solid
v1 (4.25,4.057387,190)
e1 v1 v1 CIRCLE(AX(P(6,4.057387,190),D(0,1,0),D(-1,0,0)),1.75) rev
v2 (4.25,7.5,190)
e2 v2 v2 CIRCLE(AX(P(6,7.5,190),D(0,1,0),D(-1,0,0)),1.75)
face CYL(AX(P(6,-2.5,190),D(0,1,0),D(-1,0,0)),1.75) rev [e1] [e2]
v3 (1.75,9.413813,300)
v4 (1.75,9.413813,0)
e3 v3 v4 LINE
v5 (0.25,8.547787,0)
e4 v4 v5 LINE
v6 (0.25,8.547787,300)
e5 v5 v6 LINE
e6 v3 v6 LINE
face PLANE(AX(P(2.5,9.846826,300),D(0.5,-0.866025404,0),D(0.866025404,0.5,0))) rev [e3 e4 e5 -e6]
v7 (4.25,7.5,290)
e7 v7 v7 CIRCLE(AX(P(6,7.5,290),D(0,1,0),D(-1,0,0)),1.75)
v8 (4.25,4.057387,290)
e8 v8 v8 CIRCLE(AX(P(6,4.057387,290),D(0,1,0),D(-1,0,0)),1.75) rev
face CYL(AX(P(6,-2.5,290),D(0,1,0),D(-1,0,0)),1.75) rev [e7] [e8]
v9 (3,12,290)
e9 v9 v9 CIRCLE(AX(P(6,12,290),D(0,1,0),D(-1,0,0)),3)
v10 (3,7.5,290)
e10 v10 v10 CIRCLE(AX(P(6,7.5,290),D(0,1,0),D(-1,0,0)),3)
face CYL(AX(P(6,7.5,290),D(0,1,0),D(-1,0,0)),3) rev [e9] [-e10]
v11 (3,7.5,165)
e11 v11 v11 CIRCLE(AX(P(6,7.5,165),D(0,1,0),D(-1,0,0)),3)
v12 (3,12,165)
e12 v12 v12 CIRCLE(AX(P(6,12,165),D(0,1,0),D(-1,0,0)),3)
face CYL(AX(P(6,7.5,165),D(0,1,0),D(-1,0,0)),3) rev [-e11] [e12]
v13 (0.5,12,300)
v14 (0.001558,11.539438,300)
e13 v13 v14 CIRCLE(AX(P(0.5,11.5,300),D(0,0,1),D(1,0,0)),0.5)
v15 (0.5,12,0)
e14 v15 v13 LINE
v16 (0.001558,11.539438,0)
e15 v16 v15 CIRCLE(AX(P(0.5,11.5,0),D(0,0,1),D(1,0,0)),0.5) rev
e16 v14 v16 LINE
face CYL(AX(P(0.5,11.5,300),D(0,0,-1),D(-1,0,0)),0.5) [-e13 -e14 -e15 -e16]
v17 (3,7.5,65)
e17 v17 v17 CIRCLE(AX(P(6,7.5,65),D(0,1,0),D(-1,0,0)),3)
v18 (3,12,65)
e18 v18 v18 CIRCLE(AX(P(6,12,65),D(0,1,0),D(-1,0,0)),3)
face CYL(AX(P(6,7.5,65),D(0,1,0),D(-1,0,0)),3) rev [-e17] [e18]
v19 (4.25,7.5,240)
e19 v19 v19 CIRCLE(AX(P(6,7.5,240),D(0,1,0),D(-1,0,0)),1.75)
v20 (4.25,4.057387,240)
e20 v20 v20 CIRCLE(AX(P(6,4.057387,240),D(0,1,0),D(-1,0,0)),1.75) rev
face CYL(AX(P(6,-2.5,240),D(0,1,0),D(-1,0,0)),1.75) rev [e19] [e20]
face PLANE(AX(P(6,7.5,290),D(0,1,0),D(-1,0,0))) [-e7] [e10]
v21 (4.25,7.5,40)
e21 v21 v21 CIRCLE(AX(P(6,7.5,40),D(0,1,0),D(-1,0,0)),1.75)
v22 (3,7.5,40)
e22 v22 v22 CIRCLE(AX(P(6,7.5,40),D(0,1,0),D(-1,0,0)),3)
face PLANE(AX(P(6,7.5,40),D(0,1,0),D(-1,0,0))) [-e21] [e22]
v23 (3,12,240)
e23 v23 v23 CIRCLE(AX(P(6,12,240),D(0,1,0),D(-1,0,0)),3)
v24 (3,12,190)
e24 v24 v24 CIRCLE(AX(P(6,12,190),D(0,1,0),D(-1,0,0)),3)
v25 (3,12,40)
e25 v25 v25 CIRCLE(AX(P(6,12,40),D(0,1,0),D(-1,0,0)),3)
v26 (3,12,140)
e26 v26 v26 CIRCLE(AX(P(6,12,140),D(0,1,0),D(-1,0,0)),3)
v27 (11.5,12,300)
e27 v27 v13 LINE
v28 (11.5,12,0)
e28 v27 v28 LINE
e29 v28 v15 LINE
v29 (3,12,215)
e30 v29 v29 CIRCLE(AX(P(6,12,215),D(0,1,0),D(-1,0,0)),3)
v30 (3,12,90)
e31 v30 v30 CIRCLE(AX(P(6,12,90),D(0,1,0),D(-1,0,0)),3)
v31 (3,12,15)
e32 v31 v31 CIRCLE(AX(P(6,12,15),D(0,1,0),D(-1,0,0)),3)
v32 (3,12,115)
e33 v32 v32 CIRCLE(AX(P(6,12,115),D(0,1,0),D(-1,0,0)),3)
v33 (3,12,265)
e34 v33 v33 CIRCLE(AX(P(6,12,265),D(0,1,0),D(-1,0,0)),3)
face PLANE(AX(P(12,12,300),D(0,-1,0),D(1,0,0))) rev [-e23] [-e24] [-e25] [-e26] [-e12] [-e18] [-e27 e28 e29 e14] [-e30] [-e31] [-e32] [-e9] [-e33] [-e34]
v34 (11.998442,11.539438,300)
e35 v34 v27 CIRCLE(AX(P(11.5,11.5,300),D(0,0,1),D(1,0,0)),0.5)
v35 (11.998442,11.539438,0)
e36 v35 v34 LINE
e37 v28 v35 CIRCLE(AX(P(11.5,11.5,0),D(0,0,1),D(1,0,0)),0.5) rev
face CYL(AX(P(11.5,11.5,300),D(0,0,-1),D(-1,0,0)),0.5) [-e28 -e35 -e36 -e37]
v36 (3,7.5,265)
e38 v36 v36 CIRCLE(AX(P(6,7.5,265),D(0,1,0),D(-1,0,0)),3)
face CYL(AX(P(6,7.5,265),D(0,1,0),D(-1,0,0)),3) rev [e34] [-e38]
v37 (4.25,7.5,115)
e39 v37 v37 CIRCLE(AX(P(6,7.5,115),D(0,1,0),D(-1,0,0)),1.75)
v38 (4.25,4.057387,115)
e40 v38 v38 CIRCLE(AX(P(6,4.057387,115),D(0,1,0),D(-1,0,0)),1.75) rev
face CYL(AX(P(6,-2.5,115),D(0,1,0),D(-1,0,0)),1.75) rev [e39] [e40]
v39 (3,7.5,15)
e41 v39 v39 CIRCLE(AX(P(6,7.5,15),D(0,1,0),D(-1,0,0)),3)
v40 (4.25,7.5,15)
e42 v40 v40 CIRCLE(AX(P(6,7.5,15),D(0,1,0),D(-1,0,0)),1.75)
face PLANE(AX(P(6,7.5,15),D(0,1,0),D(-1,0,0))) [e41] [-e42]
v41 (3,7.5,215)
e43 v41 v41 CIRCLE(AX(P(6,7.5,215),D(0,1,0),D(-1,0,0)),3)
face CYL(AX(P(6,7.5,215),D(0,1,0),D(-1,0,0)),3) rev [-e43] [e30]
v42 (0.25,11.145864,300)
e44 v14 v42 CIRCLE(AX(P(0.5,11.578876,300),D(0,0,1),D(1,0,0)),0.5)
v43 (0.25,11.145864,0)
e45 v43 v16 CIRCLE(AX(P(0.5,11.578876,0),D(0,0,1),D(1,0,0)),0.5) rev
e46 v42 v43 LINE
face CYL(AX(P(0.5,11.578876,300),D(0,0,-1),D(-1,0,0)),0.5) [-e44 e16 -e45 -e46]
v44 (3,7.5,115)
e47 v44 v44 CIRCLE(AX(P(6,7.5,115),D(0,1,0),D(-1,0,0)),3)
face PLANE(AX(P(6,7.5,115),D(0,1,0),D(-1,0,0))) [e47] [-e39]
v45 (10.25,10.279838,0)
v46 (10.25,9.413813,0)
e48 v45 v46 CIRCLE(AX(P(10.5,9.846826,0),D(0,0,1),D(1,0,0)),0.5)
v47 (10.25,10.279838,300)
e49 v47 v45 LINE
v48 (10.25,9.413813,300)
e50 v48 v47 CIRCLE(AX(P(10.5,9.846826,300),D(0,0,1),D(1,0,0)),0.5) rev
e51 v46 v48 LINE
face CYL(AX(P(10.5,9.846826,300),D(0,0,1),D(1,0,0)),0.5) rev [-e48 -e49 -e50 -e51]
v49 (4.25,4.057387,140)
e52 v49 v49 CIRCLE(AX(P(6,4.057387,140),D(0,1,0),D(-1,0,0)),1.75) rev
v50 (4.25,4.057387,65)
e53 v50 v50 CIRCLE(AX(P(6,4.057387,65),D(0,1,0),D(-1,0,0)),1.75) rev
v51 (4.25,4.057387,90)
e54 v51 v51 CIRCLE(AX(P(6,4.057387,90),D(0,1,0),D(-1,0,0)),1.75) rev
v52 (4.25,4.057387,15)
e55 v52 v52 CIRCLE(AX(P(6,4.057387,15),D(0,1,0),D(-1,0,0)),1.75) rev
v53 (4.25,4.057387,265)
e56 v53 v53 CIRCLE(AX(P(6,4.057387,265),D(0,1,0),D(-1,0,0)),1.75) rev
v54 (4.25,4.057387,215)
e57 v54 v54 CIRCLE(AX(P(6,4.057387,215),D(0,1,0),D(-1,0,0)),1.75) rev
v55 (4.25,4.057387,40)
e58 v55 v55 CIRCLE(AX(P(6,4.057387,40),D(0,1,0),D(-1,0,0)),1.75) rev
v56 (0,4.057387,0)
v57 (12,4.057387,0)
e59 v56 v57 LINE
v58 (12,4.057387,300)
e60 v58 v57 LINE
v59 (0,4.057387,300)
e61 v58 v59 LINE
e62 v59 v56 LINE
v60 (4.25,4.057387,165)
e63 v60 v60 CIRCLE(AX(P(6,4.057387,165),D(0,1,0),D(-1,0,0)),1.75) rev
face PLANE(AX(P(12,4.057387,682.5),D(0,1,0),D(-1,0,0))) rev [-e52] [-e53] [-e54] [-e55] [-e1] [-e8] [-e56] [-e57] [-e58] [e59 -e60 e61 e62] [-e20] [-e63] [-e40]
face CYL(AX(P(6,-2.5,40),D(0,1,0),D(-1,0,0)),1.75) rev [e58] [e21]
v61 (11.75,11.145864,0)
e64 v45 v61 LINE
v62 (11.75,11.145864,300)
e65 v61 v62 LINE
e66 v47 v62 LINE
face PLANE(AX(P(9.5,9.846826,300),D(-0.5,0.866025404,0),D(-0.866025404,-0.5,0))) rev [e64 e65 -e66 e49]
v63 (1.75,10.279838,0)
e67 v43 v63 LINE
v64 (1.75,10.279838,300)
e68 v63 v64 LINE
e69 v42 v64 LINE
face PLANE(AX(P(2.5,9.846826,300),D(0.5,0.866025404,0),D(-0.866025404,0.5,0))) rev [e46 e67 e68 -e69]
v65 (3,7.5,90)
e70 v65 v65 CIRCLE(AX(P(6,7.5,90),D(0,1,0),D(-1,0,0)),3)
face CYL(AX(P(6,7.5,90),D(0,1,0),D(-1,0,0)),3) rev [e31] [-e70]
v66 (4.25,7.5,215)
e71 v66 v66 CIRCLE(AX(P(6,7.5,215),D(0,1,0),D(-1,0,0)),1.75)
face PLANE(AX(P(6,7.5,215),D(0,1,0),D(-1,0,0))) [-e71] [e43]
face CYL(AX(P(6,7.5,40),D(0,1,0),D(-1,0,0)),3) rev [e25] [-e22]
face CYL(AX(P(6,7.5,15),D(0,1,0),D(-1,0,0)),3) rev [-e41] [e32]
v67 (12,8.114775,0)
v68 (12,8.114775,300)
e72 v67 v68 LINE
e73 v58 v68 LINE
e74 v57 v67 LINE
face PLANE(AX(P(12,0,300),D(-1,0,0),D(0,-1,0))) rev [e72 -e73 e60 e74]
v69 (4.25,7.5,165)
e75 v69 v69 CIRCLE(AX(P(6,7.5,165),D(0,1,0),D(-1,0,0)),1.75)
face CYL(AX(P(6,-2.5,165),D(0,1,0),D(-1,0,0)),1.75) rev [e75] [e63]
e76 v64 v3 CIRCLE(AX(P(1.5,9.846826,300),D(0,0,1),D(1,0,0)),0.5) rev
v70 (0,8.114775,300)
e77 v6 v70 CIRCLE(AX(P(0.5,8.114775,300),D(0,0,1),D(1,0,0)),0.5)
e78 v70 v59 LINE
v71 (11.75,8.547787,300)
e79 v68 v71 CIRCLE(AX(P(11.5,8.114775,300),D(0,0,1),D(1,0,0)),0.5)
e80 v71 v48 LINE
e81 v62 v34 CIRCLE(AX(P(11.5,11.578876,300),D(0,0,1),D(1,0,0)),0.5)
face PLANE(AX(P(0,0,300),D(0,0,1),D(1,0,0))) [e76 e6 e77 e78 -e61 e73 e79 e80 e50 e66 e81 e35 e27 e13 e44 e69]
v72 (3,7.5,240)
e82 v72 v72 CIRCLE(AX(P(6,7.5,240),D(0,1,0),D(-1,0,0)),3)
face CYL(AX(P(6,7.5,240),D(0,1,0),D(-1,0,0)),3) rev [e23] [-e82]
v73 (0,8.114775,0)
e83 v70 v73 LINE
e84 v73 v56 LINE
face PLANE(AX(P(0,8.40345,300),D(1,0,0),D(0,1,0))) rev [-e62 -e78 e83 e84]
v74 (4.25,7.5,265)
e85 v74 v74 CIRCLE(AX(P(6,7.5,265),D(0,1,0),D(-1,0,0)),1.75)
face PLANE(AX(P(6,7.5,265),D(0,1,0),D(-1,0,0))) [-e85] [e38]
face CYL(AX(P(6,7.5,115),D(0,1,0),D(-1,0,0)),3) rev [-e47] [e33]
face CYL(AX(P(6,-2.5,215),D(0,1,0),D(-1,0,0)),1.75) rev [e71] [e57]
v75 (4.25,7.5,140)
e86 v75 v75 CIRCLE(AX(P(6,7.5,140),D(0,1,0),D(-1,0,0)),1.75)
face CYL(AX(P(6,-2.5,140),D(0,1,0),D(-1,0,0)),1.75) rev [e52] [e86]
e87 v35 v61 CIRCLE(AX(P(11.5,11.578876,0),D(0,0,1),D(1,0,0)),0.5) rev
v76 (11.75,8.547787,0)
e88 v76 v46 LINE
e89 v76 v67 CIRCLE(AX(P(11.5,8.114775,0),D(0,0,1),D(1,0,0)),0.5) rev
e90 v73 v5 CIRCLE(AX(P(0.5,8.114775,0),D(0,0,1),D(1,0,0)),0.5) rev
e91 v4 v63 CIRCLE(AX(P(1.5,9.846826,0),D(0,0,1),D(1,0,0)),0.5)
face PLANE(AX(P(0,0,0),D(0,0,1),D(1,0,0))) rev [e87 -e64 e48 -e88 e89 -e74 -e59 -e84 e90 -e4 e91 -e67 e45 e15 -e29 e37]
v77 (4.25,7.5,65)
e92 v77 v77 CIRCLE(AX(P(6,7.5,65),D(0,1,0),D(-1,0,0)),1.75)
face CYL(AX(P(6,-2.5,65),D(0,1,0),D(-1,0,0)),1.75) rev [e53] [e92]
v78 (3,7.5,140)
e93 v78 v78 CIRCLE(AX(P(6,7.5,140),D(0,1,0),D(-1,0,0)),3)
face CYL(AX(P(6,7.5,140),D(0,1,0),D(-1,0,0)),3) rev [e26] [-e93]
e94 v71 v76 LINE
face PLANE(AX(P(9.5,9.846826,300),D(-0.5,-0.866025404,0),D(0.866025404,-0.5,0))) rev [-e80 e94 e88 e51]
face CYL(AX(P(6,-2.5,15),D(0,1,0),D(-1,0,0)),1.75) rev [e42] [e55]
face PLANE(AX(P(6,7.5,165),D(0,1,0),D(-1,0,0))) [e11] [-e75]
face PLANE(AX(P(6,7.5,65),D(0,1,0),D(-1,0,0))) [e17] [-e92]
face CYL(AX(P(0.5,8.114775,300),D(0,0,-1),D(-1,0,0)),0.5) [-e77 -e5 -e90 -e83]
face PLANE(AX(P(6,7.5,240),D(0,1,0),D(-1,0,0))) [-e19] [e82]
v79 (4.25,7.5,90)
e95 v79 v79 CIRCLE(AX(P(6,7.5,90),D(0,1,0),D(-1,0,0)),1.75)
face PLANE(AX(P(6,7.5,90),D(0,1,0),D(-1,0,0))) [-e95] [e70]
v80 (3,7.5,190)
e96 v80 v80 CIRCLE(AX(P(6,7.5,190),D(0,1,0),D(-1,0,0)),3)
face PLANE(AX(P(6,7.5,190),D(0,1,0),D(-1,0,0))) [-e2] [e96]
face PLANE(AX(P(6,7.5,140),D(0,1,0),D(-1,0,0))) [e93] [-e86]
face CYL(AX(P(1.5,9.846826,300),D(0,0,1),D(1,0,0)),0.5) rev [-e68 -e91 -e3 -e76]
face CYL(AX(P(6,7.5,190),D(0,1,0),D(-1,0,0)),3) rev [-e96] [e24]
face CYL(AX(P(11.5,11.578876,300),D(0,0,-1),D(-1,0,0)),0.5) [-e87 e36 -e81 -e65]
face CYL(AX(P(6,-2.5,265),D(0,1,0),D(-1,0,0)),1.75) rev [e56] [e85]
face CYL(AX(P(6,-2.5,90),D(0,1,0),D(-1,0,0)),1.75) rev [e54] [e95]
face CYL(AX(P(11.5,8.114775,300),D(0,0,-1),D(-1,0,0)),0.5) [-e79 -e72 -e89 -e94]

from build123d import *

# Parameters (mm, degrees)
BOSS_EXTRUDE2_DEPTH = 300
FILLET5_R           = 0.5
SKETCH3_R           = 3
CUT_EXTRUDE2_DEPTH  = 4.5
SKETCH4_R           = 1.75
CUT_EXTRUDE3_DEPTH  = 14.5
SKETCH5_W           = 12
SKETCH5_H           = 4.057387372
CUT_EXTRUDE4_DEPTH  = 682.5


with BuildPart() as part:
    # Sketch1 → Boss-Extrude2 (new body)
    with BuildSketch(Plane.XY):
        Polygon((0, 0), (12, 0), (12, 8.403449878), (9.5, 9.846825551), (12, 11.290201224), (12, 12), (0, 12), (0, 11.290201224), (2.5, 9.846825551), (0, 8.403449878), align=None)
    extrude(amount=BOSS_EXTRUDE2_DEPTH)

    # Fillet5
    # the kernel refuses this fillet: 0.5 mm, written as the material it adds along each edge
    with BuildSketch(Plane(origin=(2.5, 9.846825551, 0), x_dir=(-0.8660254037844382, 0.5000000000000009, 0), z_dir=(0, 0, 1)), Plane(origin=(9.5, 9.846825551, 0), x_dir=(0.8660254037844379, -0.5000000000000013, 0), z_dir=(0, 0, 1))) as fillet5_piece_1:
        with BuildLine():
            CenterArc((FILLET5_R * 1.73205080757, FILLET5_R), FILLET5_R, 150, 120)
            Line((FILLET5_R * 0.866025403784, FILLET5_R * 1.5), (0, 0))
            Line((0, 0), (FILLET5_R * 1.73205080757, 0))
        make_face()
    extrude(amount=300)
    # the kernel refuses this fillet: 0.5 mm, written as the material it takes off along each edge
    with BuildSketch(Plane(origin=(0, 8.403449878, -0.721687836), x_dir=(0, -1, 0), z_dir=(0, 0, 1))) as fillet5_2_piece_1:
        with BuildLine():
            CenterArc((FILLET5_R * 0.57735026919, FILLET5_R), FILLET5_R, 210, 60)
            Line((-FILLET5_R * 0.288675134595, FILLET5_R * 0.5), (0, 0))
            Line((0, 0), (FILLET5_R * 0.57735026919, 0))
        make_face()
    extrude(amount=301.443375673, mode=Mode.SUBTRACT)
    with BuildSketch(Plane(origin=(0, 11.290201224, -0.721687836), x_dir=(0, 1, 0), z_dir=(0, 0, 1)), Plane(origin=(12, 11.290201224, -0.721687836), x_dir=(-0.8660254037844355, -0.5000000000000052, 0), z_dir=(0, 0, 1)), Plane(origin=(12, 8.403449878, -0.721687836), x_dir=(0, -1, 0), z_dir=(0, 0, 1))) as fillet5_2_piece_2:
        with BuildLine():
            CenterArc((FILLET5_R * 0.57735026919, -FILLET5_R), FILLET5_R, 90, 60)
            Line((-FILLET5_R * 0.288675134595, -FILLET5_R * 0.5), (0, 0))
            Line((0, 0), (FILLET5_R * 0.57735026919, 0))
        make_face()
    extrude(amount=301.443375673, mode=Mode.SUBTRACT)
    with BuildSketch(Plane(origin=(0, 12, -1.25), x_dir=(1, 0, 0), z_dir=(0, 0, 1)), Plane(origin=(12, 12, -1.25), x_dir=(0, -1, 0), z_dir=(0, 0, 1))) as fillet5_2_piece_3:
        with BuildLine():
            CenterArc((FILLET5_R, -FILLET5_R), FILLET5_R, 90, 90)
            Line((0, -FILLET5_R), (0, 0))
            Line((0, 0), (FILLET5_R, 0))
        make_face()
    extrude(amount=302.5, mode=Mode.SUBTRACT)

    # Sketch3 → Cut-Extrude2 (cut)
    with BuildSketch(Plane(origin=(0, 12, 0), x_dir=(1, 0, 0), z_dir=(0, 1, 0))):
        with Locations((6, -490)):
            Circle(SKETCH3_R)
        with Locations((6, -440)):
            Circle(SKETCH3_R)
        with Locations((6, -415)):
            Circle(SKETCH3_R)
        with Locations((6, -390)):
            Circle(SKETCH3_R)
        with Locations((6, -365)):
            Circle(SKETCH3_R)
        with Locations((6, -340)):
            Circle(SKETCH3_R)
        with Locations((6, -315)):
            Circle(SKETCH3_R)
        with Locations(Location((6, -290, 0), (0, 0, 180))):
            Circle(SKETCH3_R)
        with Locations(Location((6, -265, 0), (0, 0, 180))):
            Circle(SKETCH3_R)
        with Locations(Location((6, -240, 0), (0, 0, 180))):
            Circle(SKETCH3_R)
        with Locations(Location((6, -215, 0), (0, 0, 180))):
            Circle(SKETCH3_R)
        with Locations(Location((6, -190, 0), (0, 0, 180))):
            Circle(SKETCH3_R)
        with Locations(Location((6, -165, 0), (0, 0, 180))):
            Circle(SKETCH3_R)
        with Locations(Location((6, -140, 0), (0, 0, 180))):
            Circle(SKETCH3_R)
        with Locations(Location((6, -115, 0), (0, 0, 180))):
            Circle(SKETCH3_R)
        with Locations(Location((6, -90, 0), (0, 0, 180))):
            Circle(SKETCH3_R)
        with Locations(Location((6, -65, 0), (0, 0, 180))):
            Circle(SKETCH3_R)
        with Locations(Location((6, -40, 0), (0, 0, 180))):
            Circle(SKETCH3_R)
        with Locations(Location((6, -15, 0), (0, 0, 180))):
            Circle(SKETCH3_R)
        with Locations((6, -465)):
            Circle(SKETCH3_R)
    extrude(amount=-CUT_EXTRUDE2_DEPTH, mode=Mode.SUBTRACT)

    # Sketch4 → Cut-Extrude3 (cut)
    with BuildSketch(Plane(origin=(0, 12, 0), x_dir=(1, 0, 0), z_dir=(0, 1, 0))):
        with Locations(Location((6, -15, 0), (0, 0, 180))):
            Circle(SKETCH4_R)
        with Locations(Location((6, -40, 0), (0, 0, 180))):
            Circle(SKETCH4_R)
        with Locations(Location((6, -65, 0), (0, 0, 180))):
            Circle(SKETCH4_R)
        with Locations(Location((6, -90, 0), (0, 0, 180))):
            Circle(SKETCH4_R)
        with Locations(Location((6, -115, 0), (0, 0, 180))):
            Circle(SKETCH4_R)
        with Locations(Location((6, -140, 0), (0, 0, 180))):
            Circle(SKETCH4_R)
        with Locations(Location((6, -165, 0), (0, 0, 180))):
            Circle(SKETCH4_R)
        with Locations(Location((6, -190, 0), (0, 0, 180))):
            Circle(SKETCH4_R)
        with Locations(Location((6, -215, 0), (0, 0, 180))):
            Circle(SKETCH4_R)
        with Locations(Location((6, -240, 0), (0, 0, 180))):
            Circle(SKETCH4_R)
        with Locations(Location((6, -265, 0), (0, 0, 180))):
            Circle(SKETCH4_R)
        with Locations(Location((6, -290, 0), (0, 0, 180))):
            Circle(SKETCH4_R)
        with Locations((6, -315)):
            Circle(SKETCH4_R)
        with Locations((6, -340)):
            Circle(SKETCH4_R)
        with Locations((6, -365)):
            Circle(SKETCH4_R)
        with Locations((6, -390)):
            Circle(SKETCH4_R)
        with Locations((6, -415)):
            Circle(SKETCH4_R)
        with Locations((6, -440)):
            Circle(SKETCH4_R)
        with Locations((6, -465)):
            Circle(SKETCH4_R)
        with Locations((6, -490)):
            Circle(SKETCH4_R)
    extrude(amount=-CUT_EXTRUDE3_DEPTH, mode=Mode.SUBTRACT)

    # Sketch5 → Cut-Extrude4 (cut)
    with BuildSketch(Plane(origin=(0, 0, 0), x_dir=(-1, 0, 0), z_dir=(0, 0, -1))):
        with Locations((-6, 2.028693686)):
            Rectangle(SKETCH5_W, SKETCH5_H)
    extrude(amount=-CUT_EXTRUDE4_DEPTH, mode=Mode.SUBTRACT)


solid = part.part
